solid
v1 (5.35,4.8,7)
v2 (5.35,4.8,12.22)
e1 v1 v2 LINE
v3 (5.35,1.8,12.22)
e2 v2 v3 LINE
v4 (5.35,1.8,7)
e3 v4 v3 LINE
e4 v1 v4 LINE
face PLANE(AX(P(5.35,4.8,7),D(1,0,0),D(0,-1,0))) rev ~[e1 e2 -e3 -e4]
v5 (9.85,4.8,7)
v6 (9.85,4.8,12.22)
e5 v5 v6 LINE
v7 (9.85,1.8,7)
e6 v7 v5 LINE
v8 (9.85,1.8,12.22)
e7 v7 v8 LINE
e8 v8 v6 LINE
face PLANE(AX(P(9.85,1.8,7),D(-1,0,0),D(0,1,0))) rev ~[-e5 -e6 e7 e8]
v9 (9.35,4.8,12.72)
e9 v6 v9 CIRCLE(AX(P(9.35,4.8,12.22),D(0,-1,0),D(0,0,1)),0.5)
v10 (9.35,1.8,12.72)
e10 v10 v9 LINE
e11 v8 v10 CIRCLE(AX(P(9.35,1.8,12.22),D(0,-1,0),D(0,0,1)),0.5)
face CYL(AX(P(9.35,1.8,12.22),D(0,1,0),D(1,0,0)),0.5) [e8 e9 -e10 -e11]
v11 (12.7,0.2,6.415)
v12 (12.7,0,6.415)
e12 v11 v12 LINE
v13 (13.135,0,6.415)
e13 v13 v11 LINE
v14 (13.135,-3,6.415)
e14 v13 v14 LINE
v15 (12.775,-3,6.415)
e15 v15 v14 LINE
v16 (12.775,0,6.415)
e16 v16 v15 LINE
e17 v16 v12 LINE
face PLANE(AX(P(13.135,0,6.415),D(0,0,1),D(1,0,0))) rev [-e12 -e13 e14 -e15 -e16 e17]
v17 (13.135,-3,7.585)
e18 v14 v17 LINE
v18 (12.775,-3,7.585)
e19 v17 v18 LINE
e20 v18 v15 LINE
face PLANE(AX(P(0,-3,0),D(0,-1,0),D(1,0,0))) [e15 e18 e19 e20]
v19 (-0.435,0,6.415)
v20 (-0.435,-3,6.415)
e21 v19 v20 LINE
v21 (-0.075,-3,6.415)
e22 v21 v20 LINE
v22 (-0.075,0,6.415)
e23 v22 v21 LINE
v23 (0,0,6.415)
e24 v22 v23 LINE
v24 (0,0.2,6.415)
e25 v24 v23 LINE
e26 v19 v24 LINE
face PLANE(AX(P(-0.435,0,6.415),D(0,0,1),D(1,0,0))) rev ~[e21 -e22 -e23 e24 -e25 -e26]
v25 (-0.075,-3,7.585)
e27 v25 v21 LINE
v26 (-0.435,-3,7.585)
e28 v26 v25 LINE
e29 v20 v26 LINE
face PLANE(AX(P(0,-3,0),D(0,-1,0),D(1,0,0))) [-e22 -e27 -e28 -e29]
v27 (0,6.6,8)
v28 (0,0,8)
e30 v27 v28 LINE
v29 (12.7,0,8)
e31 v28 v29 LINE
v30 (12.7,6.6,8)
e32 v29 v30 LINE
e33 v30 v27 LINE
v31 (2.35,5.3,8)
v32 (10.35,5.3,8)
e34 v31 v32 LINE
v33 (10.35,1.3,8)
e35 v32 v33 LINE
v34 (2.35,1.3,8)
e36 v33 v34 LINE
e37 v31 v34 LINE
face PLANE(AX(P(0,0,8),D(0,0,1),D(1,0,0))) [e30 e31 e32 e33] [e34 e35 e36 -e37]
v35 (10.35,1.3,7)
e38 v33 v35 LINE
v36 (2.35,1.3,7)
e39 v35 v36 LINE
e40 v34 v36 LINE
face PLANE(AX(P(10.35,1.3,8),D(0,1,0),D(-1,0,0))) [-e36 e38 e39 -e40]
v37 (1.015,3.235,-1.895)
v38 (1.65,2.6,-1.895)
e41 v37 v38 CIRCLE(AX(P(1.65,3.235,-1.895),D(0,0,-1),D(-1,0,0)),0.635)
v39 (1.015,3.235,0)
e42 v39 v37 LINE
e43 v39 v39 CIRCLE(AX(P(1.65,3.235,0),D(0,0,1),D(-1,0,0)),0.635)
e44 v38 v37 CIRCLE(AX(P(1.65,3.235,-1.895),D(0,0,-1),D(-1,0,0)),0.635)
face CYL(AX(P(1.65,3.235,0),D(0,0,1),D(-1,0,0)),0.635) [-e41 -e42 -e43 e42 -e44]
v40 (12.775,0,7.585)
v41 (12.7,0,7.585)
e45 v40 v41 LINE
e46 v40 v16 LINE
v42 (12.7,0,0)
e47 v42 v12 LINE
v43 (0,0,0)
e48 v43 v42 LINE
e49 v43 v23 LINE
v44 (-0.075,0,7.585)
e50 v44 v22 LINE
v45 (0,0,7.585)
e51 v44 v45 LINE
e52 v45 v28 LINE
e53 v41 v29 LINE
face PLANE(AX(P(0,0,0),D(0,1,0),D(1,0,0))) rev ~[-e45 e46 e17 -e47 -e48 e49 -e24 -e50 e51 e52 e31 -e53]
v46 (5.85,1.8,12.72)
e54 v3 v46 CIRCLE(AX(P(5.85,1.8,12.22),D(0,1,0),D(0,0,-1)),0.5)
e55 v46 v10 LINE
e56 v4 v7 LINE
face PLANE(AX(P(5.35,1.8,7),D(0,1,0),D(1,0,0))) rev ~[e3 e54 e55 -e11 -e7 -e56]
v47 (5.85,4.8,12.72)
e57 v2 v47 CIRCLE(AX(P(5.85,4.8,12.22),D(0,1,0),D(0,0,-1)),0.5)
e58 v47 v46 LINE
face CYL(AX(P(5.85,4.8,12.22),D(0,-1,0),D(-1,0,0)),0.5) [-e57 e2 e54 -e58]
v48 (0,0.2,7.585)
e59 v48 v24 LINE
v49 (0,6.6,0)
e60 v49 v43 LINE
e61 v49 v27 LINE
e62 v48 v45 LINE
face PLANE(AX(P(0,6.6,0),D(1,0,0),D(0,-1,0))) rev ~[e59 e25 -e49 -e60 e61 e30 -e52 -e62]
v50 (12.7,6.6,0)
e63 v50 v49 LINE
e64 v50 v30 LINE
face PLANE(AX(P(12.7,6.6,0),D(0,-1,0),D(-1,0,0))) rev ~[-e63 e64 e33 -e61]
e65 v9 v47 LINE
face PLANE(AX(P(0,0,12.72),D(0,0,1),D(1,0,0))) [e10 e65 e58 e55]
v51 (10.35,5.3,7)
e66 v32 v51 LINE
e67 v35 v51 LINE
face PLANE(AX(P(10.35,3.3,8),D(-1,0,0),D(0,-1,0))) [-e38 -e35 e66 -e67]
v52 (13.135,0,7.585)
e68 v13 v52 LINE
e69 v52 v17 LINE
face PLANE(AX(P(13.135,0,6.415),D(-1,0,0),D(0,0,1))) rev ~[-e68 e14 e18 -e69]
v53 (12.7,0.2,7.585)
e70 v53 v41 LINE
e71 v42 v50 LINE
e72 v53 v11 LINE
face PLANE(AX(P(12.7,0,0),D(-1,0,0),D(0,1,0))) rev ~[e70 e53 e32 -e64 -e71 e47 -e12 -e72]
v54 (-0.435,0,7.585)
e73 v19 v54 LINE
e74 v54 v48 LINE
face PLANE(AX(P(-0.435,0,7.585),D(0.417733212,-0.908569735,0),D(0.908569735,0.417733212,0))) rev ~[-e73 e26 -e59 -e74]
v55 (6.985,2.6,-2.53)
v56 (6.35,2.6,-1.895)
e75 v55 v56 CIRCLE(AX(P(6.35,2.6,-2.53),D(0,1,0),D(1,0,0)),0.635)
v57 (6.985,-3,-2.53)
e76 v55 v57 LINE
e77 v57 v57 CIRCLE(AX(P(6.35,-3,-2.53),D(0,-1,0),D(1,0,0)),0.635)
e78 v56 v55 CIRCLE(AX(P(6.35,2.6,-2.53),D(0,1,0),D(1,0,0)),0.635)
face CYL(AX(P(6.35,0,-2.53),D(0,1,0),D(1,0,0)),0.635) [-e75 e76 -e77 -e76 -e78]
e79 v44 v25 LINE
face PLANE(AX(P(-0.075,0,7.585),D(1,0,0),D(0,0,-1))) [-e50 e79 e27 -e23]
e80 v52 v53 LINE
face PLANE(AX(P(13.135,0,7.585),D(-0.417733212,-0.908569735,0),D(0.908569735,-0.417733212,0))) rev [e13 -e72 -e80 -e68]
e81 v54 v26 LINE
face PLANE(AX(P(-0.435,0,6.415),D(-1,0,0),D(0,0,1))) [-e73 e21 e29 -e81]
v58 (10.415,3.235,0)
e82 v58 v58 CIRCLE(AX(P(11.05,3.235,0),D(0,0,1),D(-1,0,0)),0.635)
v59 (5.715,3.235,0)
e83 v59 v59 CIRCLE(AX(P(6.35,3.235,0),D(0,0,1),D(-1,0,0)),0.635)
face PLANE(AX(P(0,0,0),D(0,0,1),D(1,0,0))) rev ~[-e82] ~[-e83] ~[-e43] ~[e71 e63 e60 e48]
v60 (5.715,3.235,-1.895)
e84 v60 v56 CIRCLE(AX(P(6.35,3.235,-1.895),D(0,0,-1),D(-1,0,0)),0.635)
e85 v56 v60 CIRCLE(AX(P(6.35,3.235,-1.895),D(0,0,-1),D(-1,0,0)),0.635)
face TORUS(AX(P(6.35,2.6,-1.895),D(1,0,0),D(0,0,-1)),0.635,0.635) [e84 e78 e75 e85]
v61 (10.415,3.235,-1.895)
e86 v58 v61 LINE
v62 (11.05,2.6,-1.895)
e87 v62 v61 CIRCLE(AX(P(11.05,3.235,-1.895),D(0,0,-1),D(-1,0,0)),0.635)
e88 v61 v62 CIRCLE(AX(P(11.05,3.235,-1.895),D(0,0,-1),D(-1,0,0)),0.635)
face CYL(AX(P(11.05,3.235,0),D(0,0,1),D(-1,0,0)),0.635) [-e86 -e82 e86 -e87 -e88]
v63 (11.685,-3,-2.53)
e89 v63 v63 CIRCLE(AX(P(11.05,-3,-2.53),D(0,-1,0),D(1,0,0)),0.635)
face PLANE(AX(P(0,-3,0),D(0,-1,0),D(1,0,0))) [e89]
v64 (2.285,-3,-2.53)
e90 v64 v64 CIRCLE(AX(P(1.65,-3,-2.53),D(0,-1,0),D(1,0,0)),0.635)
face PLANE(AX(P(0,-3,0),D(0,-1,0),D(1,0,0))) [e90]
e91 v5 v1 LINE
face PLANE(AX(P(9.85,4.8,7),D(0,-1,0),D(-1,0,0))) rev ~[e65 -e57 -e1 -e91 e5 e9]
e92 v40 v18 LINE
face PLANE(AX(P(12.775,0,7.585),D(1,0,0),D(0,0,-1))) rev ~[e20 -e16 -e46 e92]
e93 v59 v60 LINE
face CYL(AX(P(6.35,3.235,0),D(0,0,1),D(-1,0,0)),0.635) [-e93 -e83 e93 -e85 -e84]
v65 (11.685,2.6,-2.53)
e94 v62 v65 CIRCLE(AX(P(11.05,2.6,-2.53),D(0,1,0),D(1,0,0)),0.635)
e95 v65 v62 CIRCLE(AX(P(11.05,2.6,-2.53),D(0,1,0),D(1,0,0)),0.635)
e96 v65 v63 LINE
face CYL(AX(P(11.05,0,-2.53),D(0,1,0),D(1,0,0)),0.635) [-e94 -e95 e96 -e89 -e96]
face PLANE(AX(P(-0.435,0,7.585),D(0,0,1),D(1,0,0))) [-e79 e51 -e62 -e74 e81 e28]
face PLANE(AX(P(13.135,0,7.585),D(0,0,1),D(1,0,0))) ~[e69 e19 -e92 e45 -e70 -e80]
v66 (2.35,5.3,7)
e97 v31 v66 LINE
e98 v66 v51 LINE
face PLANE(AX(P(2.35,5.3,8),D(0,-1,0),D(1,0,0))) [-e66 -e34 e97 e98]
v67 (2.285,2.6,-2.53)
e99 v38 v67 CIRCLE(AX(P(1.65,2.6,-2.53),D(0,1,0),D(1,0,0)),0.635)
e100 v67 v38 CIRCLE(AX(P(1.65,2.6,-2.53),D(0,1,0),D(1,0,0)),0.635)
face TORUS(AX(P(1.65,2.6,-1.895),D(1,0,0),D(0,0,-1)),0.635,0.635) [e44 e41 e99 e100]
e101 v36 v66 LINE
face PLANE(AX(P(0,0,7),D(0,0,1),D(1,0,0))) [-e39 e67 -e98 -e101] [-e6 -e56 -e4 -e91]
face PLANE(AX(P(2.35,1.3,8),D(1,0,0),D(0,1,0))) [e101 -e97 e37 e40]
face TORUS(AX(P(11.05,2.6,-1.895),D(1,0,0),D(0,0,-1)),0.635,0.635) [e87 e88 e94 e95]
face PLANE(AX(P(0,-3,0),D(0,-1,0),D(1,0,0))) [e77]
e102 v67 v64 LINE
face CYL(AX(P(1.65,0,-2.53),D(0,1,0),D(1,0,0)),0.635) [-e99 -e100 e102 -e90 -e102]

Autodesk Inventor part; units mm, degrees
ref_plane "YZ Plane" through (0, 0, 0) normal (1, 0, 0) x (0, 1, 0)
sketch "Sketch1" plane through (0, 0, 0) normal (0, 0, 1) x (1, 0, 0)
  line L0 (0, 0) -> (12.7, 0)
  line L1 (12.7, 0) -> (12.7, 6.6)
  line L2 (12.7, 6.6) -> (0, 6.6)
  line L3 (0, 6.6) -> (0, 0)
  dimension "d0" = 12.7
  dimension "d1" = 6.6
extrude "Extrusion1" add sketch "Sketch1" along normal blind 8
sketch "Sketch2" plane through (0, 0, 0) normal (0, -1, 0) x (1, 0, 0)
  line L0 (0, 0) -> (12.7, 0) construction
  line L1 (12.7, 0) -> (12.7, 8) construction
  line L2 (0, 8) -> (12.7, 8) construction
  line L3 (0, 0) -> (0, 8) construction
  line L4 (0, 0) -> (12.7, 0) construction
  line L5 (6.35, 0) -> (6.35, 8) construction
  line L6 (0, 8) -> (12.7, 8) construction
  line L7 (13.135, 7.585) -> (12.775, 7.585)
  line L8 (12.775, 7.585) -> (12.775, 6.415)
  line L9 (12.775, 6.415) -> (13.135, 6.415)
  line L10 (13.135, 6.415) -> (13.135, 7.585)
  line L11 (13.135, 7.585) -> (12.775, 6.415) construction
  line L12 (12.775, 7.585) -> (13.135, 6.415) construction
  circle A0 centre (6.35, -2.53) radius 0.635
  circle A1 centre (11.05, -2.53) radius 0.635
  circle A2 centre (1.65, -2.53) radius 0.635
  line L13 (11.05, -2.53) -> (6.35, -2.53) construction
  line L14 (6.35, -2.53) -> (1.65, -2.53) construction
  line L15 (-0.435, 7.585) -> (-0.075, 7.585)
  line L16 (-0.075, 7.585) -> (-0.075, 6.415)
  line L17 (-0.075, 6.415) -> (-0.435, 6.415)
  line L18 (-0.435, 6.415) -> (-0.435, 7.585)
  point P0 (12.955, 7)
  dimension "d4" = 1.17
  dimension "d5" = 0.36
  dimension "d6" = 6.605
  dimension "d7" = 1.27
  dimension "d8" = 1.27
  dimension "d9" = 1.27
  dimension "d10" = 9.53
  dimension "d11" = 4.7
  dimension "d12" = 4.7
  dimension "d13" = 1
extrude "Extrusion2" add sketch "Sketch2" along normal blind 3
ref_plane "Work Plane1" through (0, 2.6, 0) normal (0, 1, 0) x (1, 0, 0)
sketch "Sketch3" plane through (11.05, 0, -2.53) normal (0, 1, 0) x (1, 0, 0)
  circle A0 centre (0, 0) radius 0.635 projected
  circle A1 centre (-4.7, 0) radius 0.635 projected
  circle A2 centre (-9.4, 0) radius 0.635 projected
  point P0 (-11.05, -2.53)
extrude "Extrusion3" add sketch "Sketch3" along normal up to surface (2.6 mm away)
sketch "Sketch4" plane through (0, 0, 0) normal (0, 0, -1) x (-1, 0, 0)
  line L0 (-6.985, 2.6) -> (-5.715, 2.6) projected
  line L1 (-6.35, 2.6) -> (-6.35, 3.235) construction
  circle A0 centre (-6.35, 3.235) radius 0.635
  point P0 (0, 0)
  dimension "d19" = 0.635
extrude "Extrusion4" add sketch "Sketch4" along normal blind 1.895
sketch "Sketch5" plane through (0, 0, -1.895) normal (0, 0, -1) x (-1, 0, 0)
  arc A0 (-5.715, 3.235) -> (-6.35, 2.6) centre (-6.35, 3.235) ccw construction
  arc A1 (-5.715, 3.235) -> (-6.35, 2.6) centre (-6.35, 3.235) ccw projected
  arc A2 (-6.35, 2.6) -> (-5.715, 3.235) centre (-6.35, 3.235) ccw projected
  point P0 (0, 0)
ref_plane "Work Plane2" through (6.35, 3.235, -1.895) normal (1, 0, 0) x (0, 0, -1)
sketch "Sketch6" plane through (6.35, 3.235, -1.895) normal (1, 0, 0) x (0, 0, -1)
  line L0 (0.635, -0.635) -> (0, -0.635) construction
  line L1 (0, -0.635) -> (0.635, -0.635) construction
  line L2 (0, -0.635) -> (0, 0) construction
  arc A0 (0.635, -0.635) -> (0, 0) centre (0, -0.635) ccw
  point P0 (-1.895, -3.235)
sweep "Sweep1" add profiles "Sketch5" path "Sketch6"
pattern_linear "Rectangular Pattern1" count 3 spacing 4.7 along (-1, 0, 0) of "Sweep1", "Extrusion4" first direction both ways yes
sketch "Sketch7" plane through (-0.435, 0, 7.585) normal (0, 0, 1) x (1, 0, 0)
  line L0 (0.36, 0) -> (0, 0) projected
  line L1 (0.435, 0) -> (13.135, 0) projected
  line L2 (13.135, 0) -> (13.135, 6.6) projected
  line L3 (13.135, 6.6) -> (0.435, 6.6) projected
  line L4 (0.435, 6.6) -> (0.435, 0) projected
  line L5 (0.36, 0) -> (0.36, -3) projected
  line L6 (0.36, 0) -> (0.435, 0)
  line L7 (0, 0) -> (0.435, 0.2)
  line L8 (0.435, 6.6) -> (0.435, 0) projected
  dimension "d27" = 0.2
extrude "Extrusion5" add sketch "Sketch7" against normal up to surface (1.17 mm away) contours L0 L7 L4 L6
mirror "Mirror1" about plane through (6.35, 3.235, -1.895) normal (1, 0, 0) of "Extrusion5"
ref_plane "Work Plane3" through (0, 3.3, 0) normal (0, -1, 0) x (1, 0, 0)
sketch "Sketch9" plane through (0, 0, 8) normal (0, 0, 1) x (1, 0, 0)
  line L0 (15.849, 3.3) -> (-3.149, 3.3) projected
  line L1 (2.35, 5.3) -> (10.35, 5.3)
  line L2 (10.35, 5.3) -> (10.35, 1.3)
  line L3 (10.35, 1.3) -> (2.35, 1.3)
  line L4 (2.35, 1.3) -> (2.35, 5.3)
  line L5 (0, 0) -> (12.7, 0) construction
  line L6 (12.7, 0) -> (12.7, 6.6) construction
  line L7 (12.7, 6.6) -> (0, 6.6) construction
  line L8 (0, 6.6) -> (0, 0) construction
  line L9 (12.7, 6.6) -> (0, 6.6) construction
  line L10 (6.35, 6.6) -> (6.35, 0) construction
  line L11 (0, 0) -> (12.7, 0) construction
  dimension "d30" = 8
  dimension "d31" = 4
extrude "Extrusion6" cut sketch "Sketch9" against normal blind 1
sketch "Sketch10" plane through (0, 0, 7) normal (0, 0, 1) x (1, 0, 0)
  line L0 (2.35, 5.3) -> (10.35, 5.3) projected
  line L1 (2.35, 1.3) -> (2.35, 5.3) projected
  line L2 (10.35, 1.3) -> (2.35, 1.3) projected
  line L3 (10.35, 5.3) -> (10.35, 1.3) projected
  line L4 (9.85, 4.8) -> (5.35, 4.8)
  line L5 (5.35, 4.8) -> (5.35, 1.8)
  line L6 (5.35, 1.8) -> (9.85, 1.8)
  line L7 (9.85, 1.8) -> (9.85, 4.8)
  line L8 (15.849, 3.3) -> (-3.149, 3.3) construction
  point P0 (0, 0)
  dimension "d34" = 4.5
  dimension "d35" = 0.5
  dimension "d36" = 0.5
extrude "Extrusion7" add sketch "Sketch10" along normal blind 5.72 contours L7 L6 L5 L4
fillet "Fillet1" radius 0.5 2 edges at (9.85, 3.3, 12.72) (5.35, 3.3, 12.72)
equation "\"d8\" = d7"
equation "\"d9\" = d7"
equation "\"d12\" = d11"
equation "\"d36\" = d35"
properties part number "5MS1S102AM6QE"
